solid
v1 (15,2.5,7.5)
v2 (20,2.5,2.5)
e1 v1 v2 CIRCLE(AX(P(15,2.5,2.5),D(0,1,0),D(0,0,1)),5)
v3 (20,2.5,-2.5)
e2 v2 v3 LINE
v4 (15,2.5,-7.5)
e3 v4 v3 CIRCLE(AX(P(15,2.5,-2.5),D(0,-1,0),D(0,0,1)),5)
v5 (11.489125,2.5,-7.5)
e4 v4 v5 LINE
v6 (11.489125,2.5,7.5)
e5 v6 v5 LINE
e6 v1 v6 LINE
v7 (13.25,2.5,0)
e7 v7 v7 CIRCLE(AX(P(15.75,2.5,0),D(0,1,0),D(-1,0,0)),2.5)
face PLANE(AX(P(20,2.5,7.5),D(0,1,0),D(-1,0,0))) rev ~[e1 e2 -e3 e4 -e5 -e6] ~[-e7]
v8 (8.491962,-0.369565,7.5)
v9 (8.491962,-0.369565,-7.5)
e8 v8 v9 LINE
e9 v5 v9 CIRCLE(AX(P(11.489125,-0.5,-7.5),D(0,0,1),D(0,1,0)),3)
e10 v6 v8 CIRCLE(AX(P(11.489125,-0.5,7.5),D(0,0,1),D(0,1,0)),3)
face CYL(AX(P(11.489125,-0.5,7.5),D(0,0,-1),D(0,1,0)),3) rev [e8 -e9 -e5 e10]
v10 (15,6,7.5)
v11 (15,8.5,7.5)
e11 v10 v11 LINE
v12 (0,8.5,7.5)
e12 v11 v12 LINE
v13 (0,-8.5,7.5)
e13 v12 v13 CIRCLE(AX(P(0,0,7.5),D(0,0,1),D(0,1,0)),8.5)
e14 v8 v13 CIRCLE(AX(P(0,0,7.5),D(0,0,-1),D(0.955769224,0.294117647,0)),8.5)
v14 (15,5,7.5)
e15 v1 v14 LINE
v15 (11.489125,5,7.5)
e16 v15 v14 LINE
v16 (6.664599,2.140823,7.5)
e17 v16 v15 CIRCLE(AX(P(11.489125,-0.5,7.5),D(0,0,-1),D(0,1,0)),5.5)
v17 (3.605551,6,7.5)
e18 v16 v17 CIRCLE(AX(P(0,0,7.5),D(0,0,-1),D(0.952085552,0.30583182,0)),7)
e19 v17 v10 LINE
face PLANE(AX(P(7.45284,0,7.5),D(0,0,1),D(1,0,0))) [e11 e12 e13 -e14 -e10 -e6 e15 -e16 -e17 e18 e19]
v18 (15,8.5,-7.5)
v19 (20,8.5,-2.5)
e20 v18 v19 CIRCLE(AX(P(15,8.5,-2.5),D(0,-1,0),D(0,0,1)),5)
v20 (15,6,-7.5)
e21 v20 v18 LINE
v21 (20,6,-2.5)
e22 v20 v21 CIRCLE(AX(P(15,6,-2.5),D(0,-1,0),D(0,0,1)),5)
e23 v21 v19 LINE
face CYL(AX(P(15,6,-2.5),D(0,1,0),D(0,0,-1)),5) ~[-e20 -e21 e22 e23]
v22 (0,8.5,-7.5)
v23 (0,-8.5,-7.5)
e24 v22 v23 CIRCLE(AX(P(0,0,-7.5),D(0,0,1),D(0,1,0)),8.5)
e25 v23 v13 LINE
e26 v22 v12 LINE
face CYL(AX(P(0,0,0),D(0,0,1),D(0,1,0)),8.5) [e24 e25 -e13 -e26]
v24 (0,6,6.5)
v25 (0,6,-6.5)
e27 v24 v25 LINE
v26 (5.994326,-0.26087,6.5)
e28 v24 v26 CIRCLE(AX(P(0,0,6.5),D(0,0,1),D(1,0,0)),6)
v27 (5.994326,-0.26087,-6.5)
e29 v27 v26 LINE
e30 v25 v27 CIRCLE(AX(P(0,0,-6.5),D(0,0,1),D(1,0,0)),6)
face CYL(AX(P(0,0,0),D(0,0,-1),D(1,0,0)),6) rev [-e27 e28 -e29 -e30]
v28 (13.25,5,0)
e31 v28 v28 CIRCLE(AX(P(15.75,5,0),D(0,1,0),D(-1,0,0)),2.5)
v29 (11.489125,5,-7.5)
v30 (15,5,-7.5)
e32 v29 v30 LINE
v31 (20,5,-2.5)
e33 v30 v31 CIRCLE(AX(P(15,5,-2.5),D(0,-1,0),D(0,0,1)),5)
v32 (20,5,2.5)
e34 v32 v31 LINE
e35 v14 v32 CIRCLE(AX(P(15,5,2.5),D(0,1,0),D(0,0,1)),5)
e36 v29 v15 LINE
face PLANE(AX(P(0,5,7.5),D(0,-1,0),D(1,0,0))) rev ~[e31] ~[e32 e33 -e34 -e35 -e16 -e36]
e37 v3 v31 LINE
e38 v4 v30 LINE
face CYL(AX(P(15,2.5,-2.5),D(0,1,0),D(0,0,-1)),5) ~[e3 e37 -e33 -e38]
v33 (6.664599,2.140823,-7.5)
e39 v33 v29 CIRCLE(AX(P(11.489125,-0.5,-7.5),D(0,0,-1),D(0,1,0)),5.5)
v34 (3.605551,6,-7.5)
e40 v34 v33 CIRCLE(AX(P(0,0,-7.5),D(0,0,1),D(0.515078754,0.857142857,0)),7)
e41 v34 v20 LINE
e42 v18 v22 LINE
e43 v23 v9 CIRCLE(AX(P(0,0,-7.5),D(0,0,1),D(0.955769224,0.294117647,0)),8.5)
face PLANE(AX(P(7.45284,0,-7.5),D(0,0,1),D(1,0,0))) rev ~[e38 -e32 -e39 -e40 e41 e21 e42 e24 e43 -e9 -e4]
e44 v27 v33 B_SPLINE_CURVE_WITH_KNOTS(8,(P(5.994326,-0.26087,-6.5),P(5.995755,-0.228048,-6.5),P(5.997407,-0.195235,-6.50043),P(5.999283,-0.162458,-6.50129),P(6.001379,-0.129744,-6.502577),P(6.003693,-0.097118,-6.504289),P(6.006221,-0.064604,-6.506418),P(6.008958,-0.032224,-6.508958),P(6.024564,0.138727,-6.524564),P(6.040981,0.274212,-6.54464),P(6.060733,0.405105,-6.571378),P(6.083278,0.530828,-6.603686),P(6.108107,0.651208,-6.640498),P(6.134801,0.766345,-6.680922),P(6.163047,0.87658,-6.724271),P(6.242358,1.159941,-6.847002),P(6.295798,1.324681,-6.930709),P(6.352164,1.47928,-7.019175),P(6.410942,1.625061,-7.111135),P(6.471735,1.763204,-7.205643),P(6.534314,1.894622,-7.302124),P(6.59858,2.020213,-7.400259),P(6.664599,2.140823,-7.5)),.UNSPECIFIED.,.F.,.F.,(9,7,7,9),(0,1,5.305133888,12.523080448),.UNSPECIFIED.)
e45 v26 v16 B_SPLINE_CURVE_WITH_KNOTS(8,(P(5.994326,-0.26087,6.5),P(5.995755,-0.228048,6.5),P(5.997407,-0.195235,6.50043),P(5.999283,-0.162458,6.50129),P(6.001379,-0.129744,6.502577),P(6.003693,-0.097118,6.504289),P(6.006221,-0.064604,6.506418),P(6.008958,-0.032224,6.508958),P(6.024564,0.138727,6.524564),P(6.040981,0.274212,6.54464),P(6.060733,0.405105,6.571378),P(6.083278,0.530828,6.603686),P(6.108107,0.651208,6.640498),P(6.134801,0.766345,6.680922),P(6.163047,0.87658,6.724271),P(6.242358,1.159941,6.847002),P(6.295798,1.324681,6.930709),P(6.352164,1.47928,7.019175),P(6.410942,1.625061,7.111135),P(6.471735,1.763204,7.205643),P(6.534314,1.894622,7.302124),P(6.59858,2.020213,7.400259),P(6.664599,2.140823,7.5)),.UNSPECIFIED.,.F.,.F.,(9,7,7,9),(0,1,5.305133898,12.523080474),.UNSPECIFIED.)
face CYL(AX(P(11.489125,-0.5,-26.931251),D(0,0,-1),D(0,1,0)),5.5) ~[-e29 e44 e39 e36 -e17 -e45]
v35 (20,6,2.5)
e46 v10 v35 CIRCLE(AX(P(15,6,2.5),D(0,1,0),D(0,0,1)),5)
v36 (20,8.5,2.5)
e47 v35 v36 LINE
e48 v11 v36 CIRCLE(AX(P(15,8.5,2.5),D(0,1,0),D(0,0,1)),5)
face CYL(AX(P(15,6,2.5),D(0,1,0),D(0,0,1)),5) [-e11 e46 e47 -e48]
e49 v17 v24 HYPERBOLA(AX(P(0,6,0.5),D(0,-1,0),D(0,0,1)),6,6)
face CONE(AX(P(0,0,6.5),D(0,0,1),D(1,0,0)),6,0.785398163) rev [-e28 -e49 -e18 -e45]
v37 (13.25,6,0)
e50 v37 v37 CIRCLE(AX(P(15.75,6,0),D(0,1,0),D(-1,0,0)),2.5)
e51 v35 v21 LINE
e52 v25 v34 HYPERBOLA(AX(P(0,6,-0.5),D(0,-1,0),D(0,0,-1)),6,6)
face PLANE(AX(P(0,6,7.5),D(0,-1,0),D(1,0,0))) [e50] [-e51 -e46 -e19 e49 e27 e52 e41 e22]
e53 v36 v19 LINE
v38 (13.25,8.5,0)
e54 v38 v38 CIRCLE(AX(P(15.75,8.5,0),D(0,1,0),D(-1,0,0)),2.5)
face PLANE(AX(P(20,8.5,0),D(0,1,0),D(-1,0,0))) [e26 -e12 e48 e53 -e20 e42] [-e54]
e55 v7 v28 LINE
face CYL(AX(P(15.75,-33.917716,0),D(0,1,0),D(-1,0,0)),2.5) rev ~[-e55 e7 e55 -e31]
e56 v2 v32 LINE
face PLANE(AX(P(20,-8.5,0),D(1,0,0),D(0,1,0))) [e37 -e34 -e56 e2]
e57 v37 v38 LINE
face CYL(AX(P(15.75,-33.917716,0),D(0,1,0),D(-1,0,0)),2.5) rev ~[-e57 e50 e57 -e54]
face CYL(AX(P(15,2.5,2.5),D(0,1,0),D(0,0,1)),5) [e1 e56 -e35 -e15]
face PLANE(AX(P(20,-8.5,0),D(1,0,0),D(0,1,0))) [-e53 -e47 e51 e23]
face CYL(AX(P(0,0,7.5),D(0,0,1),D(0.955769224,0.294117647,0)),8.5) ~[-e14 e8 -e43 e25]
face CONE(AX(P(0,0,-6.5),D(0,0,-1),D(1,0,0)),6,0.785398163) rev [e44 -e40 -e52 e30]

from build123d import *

# Parameters (mm, degrees)
F0_R          = 6
F1_DEPTH      = 7.5
F2_SIZE       = 1
F3_SIZE       = 1
F5_DEPTH      = 49
F5_DEPTH_BACK = 15.001
F6_R          = 3
F7_W          = 20
F7_H          = 1
F8_DEPTH      = 15.001
F9_T1_DEPTH   = 53.8625025136
F10_R         = 5
F12_D         = 5


# Not quite as in the source:
# - a fillet or chamfer that OpenCascade refuses, or shapes differently, is made with other operations: its cross-section is extruded or revolved along the edge and cut away or added
# - an extrude ends at something that could not be found from the text; its depth is read off the source's solid


with BuildPart() as f1:
    # F0 (on Top) → F1 (new body, symmetric)
    with BuildSketch(Plane.XY):
        with BuildLine():
            Line((20, 8.5), (0, 8.5))
            ThreePointArc((0, 8.5), (-8.5, 0), (0, -8.5))
            Line((0, -8.5), (20, -8.5))
            Line((20, -8.5), (20, 8.5))
        make_face()
        Circle(F0_R, mode=Mode.SUBTRACT)
    extrude(amount=F1_DEPTH, both=True)

    # F2
    f2_edges = [f1.edges().sort_by_distance(p)[0] for p in [
        (-6, 0, 7.5),
    ]]
    chamfer(f2_edges, length=F2_SIZE)

    # F3
    f3_edges = [f1.edges().sort_by_distance(p)[0] for p in [
        (-6, 0, -7.5),
    ]]
    chamfer(f3_edges, length=F3_SIZE)

    # F4 (on face) → F5 (cut, two sides)
    with BuildSketch(Plane.XY.offset(7.5)) as f5_sk:
        with BuildLine():
            ThreePointArc((8.1240384046, 2.5), (6.8373971656, -5.0497524692), (0, -8.5))
            Line((0, -8.5), (20, -8.5))
            Line((20, -8.5), (20, 2.5))
            Line((20, 2.5), (8.1240384046, 2.5))
        make_face()
    extrude(amount=F5_DEPTH, mode=Mode.SUBTRACT)
    extrude(f5_sk.sketch, amount=-F5_DEPTH_BACK, mode=Mode.SUBTRACT)

    # F6
    f6_edges = [f1.edges().sort_by_distance(p)[0] for p in [
        (8.124038, 2.5, 0),
    ]]
    fillet(f6_edges, radius=F6_R)

    # F7 (on face) → F8 (cut, through all)
    with BuildSketch(Plane.XY.offset(7.5)):
        with Locations((10, 5.5)):
            Rectangle(F7_W, F7_H)
    extrude(amount=-F8_DEPTH, mode=Mode.SUBTRACT)

    # F9: fillet of radius 5.5 on 1 edges, made by hand

    # F9_s2 → F9_t1 (cut)
    with BuildSketch(Plane.XY.offset(-26.9312512568)):
        with BuildLine():
            ThreePointArc((11.4891252931, 5), (7.6855228816, 3.4727331518), (5.9943262399, -0.2608695652))
            ThreePointArc((5.9943262399, -0.2608695652), (5.3472085631, 2.7216466675), (3.3166247904, 5))
            Line((3.3166247904, 5), (11.4891252931, 5))
        make_face()
    extrude(amount=F9_T1_DEPTH, mode=Mode.SUBTRACT)

    # F10
    f10_edges = [f1.edges().sort_by_distance(p)[0] for p in [
        (20, 7.25, -7.5),
        (20, 3.75, 7.5),
        (20, 7.25, 7.5),
        (20, 3.75, -7.5),
    ]]
    fillet(f10_edges, radius=F10_R)

    # F12 (through all)
    with Locations(Plane.XZ.offset(-2.5)):
        with Locations((15.75, 0)):
            Hole(F12_D / 2)


solid = f1.part
